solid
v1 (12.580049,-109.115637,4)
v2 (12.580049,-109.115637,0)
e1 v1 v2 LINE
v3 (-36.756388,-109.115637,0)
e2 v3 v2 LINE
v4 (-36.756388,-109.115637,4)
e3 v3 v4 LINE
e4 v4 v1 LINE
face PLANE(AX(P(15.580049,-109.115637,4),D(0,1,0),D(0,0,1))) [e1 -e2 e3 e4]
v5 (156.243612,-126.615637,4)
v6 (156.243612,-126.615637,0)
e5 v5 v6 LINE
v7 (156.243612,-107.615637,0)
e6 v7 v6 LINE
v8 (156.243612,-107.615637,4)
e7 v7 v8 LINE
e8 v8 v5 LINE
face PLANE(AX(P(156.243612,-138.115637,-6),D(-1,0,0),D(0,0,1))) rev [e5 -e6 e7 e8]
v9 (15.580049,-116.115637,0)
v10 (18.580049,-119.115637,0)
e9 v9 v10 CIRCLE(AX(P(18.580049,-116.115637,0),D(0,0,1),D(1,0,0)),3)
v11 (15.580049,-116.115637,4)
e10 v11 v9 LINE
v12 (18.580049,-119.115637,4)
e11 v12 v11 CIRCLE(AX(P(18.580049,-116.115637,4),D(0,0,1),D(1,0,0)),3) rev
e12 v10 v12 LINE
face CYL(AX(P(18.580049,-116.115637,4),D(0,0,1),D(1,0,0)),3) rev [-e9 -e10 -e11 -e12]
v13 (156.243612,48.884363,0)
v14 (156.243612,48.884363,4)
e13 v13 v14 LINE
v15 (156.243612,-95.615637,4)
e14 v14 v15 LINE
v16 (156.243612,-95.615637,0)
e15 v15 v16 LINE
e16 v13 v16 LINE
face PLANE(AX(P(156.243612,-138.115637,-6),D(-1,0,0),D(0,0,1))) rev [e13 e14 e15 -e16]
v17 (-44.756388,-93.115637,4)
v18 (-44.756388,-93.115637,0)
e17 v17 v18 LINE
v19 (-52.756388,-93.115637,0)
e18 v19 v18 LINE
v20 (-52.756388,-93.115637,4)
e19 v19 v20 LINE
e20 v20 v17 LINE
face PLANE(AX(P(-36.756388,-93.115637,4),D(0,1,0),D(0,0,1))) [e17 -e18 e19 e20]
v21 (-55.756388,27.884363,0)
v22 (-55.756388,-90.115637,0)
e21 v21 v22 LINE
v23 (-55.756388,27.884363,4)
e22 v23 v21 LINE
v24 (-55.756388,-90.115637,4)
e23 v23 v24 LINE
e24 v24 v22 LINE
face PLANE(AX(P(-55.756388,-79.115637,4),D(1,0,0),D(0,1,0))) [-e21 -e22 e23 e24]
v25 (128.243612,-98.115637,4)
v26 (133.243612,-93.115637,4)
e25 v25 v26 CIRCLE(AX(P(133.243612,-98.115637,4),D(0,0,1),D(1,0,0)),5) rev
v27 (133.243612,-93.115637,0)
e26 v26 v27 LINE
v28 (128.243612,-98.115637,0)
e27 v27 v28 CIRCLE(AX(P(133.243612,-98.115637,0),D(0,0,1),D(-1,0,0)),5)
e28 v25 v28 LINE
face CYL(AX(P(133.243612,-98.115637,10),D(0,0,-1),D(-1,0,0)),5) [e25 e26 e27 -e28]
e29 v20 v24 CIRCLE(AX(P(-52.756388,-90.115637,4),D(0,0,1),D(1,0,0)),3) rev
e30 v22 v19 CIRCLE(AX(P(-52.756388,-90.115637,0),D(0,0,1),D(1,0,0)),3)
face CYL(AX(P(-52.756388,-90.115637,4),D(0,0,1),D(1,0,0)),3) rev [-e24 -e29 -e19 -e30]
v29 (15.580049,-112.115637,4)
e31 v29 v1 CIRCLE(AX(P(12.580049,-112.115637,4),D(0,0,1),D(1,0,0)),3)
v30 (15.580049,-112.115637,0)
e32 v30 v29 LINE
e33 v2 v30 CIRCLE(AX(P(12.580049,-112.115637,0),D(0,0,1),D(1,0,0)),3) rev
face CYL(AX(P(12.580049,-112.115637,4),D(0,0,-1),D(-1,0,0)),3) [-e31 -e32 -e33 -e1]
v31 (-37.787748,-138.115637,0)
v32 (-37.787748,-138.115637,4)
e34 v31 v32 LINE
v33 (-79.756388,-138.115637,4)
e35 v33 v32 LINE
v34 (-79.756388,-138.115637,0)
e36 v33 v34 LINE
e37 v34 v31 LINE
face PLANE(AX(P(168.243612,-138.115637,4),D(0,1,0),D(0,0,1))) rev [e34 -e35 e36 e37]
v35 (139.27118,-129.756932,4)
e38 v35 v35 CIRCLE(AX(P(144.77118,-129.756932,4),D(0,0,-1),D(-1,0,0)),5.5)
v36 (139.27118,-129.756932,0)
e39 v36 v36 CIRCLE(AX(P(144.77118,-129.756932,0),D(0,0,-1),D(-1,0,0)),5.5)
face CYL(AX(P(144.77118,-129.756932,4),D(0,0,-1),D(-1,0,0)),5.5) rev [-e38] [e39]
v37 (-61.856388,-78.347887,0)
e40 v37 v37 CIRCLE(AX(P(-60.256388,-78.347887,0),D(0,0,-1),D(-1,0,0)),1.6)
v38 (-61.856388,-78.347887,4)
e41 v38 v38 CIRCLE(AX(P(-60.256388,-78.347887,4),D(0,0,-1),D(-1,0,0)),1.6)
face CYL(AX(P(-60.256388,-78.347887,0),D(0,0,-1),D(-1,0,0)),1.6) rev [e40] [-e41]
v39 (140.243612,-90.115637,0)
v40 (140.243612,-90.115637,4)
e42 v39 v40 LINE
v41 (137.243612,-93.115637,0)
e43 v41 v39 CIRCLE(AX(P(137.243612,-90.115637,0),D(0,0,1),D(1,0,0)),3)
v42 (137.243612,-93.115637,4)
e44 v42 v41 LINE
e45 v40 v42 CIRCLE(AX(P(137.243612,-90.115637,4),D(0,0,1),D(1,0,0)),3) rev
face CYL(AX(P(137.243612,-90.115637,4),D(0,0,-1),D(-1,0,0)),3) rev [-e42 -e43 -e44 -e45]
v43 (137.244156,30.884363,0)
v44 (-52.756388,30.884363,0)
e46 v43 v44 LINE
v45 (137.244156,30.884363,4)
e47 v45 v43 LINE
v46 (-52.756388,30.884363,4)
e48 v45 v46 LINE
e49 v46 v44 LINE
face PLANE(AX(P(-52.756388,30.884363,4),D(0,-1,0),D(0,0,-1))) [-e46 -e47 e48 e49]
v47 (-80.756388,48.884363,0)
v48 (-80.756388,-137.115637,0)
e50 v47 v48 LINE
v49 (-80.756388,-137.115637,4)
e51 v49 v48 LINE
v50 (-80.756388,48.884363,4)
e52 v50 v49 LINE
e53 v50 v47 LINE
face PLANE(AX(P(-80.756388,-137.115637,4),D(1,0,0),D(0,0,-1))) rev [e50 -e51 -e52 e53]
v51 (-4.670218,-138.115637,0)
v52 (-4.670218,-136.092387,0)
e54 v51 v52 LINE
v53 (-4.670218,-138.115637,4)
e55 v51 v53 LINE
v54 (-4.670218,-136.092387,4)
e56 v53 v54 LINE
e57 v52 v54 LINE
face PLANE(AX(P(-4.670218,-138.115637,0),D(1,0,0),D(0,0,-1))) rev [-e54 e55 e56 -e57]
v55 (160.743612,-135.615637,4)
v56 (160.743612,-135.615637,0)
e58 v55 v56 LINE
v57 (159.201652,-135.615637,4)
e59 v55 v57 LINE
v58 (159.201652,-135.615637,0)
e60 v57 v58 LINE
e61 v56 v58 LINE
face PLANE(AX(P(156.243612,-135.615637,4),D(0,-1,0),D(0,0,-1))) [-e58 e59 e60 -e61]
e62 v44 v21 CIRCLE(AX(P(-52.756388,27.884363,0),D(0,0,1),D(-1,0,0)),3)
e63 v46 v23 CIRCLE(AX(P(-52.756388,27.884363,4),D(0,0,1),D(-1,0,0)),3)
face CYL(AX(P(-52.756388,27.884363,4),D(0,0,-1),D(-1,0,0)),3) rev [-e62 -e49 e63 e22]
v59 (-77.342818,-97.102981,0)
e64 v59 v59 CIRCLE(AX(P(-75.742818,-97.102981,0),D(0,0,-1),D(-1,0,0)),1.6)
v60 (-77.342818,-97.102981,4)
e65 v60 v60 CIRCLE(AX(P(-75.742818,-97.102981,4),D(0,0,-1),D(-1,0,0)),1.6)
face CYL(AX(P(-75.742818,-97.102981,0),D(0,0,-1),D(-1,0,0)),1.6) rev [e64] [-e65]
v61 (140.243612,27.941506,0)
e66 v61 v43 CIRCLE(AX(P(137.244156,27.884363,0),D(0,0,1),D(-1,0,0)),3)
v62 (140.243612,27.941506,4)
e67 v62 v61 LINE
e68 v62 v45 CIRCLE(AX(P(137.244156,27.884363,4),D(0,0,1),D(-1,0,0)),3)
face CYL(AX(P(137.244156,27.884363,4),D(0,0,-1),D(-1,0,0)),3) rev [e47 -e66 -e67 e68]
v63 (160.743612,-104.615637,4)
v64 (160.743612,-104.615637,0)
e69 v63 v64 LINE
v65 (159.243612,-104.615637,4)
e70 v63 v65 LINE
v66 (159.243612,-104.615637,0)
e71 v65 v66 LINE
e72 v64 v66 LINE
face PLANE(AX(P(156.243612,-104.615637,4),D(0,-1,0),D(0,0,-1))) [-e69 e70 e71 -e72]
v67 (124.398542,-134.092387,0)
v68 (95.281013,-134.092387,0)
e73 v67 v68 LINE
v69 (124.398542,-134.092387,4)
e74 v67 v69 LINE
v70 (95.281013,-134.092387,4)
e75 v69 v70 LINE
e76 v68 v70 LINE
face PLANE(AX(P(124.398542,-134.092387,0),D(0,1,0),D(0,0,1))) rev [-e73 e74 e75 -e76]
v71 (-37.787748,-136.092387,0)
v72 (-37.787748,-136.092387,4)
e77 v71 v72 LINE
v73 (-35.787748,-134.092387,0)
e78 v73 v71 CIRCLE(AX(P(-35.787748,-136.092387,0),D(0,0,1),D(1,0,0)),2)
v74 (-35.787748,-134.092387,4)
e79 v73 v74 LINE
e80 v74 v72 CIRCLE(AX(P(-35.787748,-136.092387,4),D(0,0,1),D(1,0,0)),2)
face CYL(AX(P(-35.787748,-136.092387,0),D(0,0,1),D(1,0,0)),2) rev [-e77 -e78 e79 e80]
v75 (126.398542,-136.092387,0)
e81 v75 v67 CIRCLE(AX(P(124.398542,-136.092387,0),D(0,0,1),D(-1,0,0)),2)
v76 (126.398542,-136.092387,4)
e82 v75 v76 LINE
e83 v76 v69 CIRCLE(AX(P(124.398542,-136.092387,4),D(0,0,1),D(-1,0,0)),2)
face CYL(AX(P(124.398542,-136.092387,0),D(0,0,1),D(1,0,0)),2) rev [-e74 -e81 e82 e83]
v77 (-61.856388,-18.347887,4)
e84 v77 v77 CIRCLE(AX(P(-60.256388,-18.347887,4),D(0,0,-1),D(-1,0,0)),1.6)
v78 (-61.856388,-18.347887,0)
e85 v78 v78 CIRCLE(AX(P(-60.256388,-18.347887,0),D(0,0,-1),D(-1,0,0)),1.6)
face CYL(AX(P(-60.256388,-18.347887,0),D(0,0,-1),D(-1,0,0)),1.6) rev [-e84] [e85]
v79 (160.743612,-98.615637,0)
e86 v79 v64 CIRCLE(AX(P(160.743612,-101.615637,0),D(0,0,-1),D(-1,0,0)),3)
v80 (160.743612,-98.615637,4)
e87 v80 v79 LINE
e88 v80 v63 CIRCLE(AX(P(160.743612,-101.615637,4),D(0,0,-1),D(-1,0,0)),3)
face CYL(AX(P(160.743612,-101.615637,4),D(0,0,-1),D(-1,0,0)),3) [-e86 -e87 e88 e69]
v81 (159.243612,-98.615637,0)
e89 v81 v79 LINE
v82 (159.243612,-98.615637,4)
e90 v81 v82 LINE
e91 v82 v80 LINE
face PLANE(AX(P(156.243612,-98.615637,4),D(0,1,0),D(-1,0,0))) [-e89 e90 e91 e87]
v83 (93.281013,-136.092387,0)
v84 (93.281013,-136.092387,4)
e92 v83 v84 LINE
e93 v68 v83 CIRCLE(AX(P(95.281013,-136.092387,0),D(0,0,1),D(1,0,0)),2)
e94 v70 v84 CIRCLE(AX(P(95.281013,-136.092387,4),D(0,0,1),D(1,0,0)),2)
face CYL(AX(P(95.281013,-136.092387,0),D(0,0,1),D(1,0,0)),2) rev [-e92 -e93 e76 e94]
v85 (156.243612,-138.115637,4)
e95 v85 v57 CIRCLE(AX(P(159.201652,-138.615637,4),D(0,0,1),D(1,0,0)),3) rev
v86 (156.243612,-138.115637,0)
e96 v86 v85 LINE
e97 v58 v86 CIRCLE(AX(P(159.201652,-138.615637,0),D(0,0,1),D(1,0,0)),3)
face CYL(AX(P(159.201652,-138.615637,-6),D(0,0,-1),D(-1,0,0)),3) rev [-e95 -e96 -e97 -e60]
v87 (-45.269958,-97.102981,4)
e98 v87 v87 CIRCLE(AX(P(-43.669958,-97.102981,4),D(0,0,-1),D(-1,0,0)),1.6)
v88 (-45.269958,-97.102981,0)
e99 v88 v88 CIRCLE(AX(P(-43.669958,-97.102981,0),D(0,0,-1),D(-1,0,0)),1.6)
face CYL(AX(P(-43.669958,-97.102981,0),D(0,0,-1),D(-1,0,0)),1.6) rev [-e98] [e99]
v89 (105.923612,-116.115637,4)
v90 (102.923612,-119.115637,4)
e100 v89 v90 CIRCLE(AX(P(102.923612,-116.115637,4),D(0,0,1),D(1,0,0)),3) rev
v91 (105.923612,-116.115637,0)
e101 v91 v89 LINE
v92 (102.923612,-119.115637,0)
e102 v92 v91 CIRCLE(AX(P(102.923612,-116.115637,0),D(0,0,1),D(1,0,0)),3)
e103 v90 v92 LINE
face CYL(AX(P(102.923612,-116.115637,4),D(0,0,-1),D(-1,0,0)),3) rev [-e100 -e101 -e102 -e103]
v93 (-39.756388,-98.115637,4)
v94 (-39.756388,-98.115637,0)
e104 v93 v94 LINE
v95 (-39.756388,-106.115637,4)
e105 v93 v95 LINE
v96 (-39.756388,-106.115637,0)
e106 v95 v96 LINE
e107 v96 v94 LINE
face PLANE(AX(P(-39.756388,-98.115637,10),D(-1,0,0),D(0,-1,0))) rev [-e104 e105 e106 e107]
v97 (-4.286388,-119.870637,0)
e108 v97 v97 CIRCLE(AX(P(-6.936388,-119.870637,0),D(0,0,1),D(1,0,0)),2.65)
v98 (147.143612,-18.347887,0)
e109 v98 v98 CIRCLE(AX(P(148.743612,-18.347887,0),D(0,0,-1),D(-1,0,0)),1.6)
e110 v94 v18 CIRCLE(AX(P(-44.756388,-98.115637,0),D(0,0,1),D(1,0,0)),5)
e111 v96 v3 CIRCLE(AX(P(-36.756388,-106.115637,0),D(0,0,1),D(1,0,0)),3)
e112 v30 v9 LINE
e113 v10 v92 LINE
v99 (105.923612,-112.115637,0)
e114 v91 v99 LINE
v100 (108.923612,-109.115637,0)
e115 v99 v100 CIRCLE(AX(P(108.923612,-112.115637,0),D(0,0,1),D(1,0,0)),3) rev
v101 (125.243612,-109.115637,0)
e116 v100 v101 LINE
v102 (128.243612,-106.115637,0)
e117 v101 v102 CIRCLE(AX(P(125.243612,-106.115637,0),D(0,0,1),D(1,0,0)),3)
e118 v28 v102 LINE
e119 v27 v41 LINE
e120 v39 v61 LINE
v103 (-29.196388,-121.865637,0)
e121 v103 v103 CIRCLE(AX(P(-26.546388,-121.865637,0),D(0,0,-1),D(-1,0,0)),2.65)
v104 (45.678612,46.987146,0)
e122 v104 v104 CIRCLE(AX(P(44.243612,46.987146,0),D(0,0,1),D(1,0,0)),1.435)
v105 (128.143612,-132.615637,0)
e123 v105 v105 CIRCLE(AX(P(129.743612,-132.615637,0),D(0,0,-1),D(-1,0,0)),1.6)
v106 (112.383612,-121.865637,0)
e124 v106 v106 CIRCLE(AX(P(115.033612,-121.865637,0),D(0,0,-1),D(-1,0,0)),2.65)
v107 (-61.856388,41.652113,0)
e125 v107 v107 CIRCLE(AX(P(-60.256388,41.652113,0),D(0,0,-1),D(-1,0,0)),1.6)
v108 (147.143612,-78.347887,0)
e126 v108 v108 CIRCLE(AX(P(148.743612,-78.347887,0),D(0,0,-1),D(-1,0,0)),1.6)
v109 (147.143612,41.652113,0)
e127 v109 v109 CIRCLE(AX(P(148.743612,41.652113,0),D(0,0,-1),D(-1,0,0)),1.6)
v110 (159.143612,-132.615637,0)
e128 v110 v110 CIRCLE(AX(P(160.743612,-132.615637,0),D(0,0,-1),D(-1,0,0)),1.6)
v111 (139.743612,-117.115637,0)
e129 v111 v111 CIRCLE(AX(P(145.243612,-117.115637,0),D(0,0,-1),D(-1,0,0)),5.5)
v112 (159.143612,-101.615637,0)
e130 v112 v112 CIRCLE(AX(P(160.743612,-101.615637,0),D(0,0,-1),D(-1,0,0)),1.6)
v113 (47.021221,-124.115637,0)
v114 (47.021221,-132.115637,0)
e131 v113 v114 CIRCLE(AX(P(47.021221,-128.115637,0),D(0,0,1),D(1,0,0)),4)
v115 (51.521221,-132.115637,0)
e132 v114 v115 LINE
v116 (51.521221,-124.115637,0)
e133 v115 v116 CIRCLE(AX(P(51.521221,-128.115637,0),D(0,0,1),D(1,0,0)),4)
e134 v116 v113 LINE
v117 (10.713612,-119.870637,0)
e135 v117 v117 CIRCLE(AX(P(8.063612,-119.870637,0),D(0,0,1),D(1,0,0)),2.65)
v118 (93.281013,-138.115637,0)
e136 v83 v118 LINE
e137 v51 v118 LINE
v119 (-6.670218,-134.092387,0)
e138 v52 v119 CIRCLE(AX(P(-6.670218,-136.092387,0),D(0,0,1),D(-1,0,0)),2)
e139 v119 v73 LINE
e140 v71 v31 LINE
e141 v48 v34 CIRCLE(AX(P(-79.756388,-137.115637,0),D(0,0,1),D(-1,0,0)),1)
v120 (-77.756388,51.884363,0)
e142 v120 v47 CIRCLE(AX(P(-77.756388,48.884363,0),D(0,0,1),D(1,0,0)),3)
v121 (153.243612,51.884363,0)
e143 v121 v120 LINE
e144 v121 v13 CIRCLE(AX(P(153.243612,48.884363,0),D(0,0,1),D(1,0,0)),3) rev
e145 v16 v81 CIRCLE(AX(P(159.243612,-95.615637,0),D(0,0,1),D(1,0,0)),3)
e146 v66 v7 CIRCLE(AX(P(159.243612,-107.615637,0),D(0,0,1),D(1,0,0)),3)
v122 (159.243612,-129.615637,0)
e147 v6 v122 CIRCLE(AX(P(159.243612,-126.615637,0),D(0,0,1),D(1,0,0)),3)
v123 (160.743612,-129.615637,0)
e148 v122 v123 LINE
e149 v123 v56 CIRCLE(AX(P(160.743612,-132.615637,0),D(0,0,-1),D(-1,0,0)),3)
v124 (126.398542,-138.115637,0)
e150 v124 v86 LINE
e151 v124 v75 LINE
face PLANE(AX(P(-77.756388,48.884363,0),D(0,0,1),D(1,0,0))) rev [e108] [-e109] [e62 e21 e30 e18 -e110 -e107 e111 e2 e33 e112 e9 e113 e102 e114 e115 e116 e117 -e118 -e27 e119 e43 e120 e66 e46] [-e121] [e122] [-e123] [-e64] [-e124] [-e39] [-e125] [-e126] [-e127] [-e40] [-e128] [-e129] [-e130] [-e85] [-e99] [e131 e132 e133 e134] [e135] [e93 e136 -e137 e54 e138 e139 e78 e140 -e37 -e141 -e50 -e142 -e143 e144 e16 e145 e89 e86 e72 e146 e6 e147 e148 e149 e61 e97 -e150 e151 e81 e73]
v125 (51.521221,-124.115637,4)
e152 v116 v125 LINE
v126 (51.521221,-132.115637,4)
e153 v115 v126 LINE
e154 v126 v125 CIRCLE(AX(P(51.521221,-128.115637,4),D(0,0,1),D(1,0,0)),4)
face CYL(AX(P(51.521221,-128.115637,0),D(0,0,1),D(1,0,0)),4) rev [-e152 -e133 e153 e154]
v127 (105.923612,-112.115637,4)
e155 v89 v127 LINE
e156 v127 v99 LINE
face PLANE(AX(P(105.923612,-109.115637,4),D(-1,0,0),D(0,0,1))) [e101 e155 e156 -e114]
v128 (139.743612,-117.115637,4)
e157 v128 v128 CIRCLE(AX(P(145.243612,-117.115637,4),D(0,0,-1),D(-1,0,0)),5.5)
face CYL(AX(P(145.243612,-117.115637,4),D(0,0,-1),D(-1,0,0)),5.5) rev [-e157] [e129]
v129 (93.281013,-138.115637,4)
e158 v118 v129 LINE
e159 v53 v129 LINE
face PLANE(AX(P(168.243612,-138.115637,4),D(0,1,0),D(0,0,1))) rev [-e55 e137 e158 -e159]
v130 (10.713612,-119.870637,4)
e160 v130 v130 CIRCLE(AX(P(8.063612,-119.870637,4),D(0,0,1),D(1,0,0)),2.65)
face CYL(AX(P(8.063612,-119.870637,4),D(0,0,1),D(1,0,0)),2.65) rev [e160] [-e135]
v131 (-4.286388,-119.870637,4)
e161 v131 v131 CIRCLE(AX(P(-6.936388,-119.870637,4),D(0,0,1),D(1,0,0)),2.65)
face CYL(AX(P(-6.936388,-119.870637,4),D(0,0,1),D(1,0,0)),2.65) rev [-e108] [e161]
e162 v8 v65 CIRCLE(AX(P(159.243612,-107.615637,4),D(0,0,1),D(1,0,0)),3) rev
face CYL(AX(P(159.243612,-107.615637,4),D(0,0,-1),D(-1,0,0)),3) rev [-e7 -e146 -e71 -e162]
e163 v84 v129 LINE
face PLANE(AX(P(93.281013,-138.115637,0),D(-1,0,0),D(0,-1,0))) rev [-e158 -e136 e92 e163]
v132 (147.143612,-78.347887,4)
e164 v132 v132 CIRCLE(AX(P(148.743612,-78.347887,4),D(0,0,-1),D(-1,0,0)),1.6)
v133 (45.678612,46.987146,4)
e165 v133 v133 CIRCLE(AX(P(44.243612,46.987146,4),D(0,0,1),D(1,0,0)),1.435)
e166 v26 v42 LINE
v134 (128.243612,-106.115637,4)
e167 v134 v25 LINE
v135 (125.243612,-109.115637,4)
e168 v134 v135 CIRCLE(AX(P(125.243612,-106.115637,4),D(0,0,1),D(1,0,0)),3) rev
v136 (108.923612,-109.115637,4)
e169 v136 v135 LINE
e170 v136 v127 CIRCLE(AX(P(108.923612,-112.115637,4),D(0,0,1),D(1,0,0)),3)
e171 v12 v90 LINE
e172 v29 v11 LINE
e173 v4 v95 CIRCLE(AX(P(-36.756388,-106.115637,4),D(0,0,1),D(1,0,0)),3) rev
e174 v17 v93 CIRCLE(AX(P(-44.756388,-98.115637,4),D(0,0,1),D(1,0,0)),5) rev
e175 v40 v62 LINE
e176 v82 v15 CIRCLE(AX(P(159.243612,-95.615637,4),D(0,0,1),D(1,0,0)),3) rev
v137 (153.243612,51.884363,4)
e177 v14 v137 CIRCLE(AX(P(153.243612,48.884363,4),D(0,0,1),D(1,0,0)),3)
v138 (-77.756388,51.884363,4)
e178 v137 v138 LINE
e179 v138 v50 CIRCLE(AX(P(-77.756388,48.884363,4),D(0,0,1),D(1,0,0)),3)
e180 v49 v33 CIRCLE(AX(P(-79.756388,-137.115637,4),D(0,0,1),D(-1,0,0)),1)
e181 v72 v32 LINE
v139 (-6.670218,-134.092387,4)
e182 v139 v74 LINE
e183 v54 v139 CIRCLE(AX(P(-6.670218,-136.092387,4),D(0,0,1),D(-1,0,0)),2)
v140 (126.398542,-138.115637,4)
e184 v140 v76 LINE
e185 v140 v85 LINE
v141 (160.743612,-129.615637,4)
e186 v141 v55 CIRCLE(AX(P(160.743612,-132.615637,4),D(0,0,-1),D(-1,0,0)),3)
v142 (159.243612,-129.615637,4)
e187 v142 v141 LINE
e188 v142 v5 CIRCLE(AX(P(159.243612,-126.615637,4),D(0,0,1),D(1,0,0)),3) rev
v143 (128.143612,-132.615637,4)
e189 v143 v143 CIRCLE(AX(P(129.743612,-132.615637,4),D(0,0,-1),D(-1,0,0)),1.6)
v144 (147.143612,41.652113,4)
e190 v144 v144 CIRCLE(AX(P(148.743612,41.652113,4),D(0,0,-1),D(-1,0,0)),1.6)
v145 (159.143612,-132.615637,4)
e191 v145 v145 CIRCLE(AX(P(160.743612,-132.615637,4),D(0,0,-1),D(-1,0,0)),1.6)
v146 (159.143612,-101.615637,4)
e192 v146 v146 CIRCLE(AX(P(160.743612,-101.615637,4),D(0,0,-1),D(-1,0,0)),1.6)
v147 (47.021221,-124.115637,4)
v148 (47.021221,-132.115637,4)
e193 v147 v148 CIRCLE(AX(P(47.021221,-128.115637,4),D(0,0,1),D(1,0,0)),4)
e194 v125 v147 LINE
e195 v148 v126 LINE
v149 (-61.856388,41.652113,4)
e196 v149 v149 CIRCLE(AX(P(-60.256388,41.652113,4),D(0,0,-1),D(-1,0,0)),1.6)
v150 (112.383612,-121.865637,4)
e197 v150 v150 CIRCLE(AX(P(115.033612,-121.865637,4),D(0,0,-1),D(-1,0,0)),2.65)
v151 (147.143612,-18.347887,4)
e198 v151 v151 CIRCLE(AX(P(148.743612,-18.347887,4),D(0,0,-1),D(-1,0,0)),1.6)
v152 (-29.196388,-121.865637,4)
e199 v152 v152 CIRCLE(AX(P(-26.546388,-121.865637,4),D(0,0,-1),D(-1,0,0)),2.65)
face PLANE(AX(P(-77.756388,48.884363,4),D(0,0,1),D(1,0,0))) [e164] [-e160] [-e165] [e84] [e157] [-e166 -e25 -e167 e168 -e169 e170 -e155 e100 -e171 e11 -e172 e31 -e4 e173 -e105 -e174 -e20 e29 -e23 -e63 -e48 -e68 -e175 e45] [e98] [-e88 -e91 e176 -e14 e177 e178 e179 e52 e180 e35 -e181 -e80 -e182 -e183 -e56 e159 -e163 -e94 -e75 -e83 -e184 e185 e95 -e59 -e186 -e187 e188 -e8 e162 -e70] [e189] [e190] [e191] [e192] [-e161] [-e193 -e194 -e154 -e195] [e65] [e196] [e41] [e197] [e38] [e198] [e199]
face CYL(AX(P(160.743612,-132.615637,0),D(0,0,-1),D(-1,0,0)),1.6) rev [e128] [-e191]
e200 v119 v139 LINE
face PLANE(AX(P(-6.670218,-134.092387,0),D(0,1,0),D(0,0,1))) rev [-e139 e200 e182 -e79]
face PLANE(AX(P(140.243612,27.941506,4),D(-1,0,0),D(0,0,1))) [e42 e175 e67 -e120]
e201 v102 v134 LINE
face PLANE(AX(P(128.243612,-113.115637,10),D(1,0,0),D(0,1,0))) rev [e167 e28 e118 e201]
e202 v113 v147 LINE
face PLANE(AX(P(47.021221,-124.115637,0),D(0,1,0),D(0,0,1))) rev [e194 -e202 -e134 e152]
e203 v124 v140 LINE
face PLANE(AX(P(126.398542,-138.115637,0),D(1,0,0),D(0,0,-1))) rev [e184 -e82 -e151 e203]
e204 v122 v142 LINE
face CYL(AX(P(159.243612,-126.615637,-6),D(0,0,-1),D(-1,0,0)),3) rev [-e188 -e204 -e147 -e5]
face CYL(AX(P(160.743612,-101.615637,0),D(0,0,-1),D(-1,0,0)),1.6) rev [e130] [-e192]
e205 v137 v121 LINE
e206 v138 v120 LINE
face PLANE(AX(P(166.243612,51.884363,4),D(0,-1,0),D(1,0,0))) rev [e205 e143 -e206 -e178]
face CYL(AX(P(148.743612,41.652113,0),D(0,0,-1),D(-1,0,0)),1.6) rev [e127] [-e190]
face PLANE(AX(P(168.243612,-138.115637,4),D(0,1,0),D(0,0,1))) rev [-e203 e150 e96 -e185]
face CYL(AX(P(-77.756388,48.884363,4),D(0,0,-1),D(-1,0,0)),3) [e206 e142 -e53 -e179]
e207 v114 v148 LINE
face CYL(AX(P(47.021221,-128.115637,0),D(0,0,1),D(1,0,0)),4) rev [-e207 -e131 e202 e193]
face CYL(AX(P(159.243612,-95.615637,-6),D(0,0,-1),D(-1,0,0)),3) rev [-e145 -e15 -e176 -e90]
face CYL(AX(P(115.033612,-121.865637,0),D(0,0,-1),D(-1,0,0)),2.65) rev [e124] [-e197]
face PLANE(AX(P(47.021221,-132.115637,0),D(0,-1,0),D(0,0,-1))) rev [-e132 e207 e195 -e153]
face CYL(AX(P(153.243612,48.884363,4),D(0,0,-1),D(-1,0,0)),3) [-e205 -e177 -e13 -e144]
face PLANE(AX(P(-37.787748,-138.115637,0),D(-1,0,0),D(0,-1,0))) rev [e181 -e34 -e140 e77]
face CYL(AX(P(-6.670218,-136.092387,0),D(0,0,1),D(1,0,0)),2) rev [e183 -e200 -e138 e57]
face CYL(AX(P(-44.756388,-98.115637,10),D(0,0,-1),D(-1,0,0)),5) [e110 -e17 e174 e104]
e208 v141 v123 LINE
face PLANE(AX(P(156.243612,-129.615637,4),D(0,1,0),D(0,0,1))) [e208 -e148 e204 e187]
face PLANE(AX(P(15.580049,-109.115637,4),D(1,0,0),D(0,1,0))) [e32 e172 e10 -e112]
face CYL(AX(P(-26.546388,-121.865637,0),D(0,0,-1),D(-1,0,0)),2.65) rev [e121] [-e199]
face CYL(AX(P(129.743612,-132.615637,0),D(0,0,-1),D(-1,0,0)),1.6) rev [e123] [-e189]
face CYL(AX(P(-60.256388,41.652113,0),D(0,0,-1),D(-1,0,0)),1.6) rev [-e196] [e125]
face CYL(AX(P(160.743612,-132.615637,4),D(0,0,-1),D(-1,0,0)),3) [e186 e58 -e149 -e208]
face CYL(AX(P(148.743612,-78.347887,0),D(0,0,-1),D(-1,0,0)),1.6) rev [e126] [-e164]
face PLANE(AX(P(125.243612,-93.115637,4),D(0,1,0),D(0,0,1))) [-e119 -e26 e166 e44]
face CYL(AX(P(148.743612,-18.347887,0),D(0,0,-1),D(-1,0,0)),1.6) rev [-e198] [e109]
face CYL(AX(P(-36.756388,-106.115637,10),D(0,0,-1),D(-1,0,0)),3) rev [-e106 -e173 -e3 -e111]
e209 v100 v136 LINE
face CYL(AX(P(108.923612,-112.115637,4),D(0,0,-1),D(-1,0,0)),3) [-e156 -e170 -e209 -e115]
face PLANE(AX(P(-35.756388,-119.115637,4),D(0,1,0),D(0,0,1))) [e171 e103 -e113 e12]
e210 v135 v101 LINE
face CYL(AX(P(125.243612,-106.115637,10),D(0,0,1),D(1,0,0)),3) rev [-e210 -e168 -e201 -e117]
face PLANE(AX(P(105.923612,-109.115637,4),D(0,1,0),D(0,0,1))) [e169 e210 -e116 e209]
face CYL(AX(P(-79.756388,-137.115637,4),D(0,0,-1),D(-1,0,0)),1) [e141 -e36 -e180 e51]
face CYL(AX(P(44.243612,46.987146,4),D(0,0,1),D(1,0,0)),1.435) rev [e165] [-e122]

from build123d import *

# Parameters (mm, degrees)
RESSALTO_EXTRUS_O1_DEPTH = 4
FURO_COM_FOLGA_DE_M31_D  = 3.2
FILETE1_R                = 3
M3_CLEARANCE_HOLE1_D     = 3.2
FURO_COM_FOLGA_DE_M32_D  = 2.87
M3_CLEARANCE_HOLE2_D     = 3.2
SKETCH3_W                = 27.430623534
SKETCH3_H                = 190
CUT_EXTRUDE1_DEPTH       = 10
BOSS_EXTRUDE1_DEPTH      = 4
CUT_EXTRUDE3_DEPTH       = 10
FILLET2_R                = 3
FILLET3_R                = 3
SKETCH9_W                = 23.417498706
SKETCH9_H                = 10.613187714
SKETCH9_W_2              = 56.748489153
BOSS_EXTRUDE2_DEPTH      = 4
FILLET4_R                = 3
BOSS_EXTRUDE3_DEPTH      = 4
M3_CLEARANCE_HOLE4_D     = 3.2
FILLET5_R                = 3
M5_CLEARANCE_HOLE1_D     = 5.3
CUT_EXTRUDE4_DEPTH       = 215.251953603
CUT_EXTRUDE5_DEPTH       = 215.251953603
SKETCH15_R               = 5.5
CUT_EXTRUDE6_DEPTH       = 215.251953603
M5_CLEARANCE_HOLE2_D     = 5.3
FILLET6_R                = 3


# Some blends are built 0.0001 mm under size
with BuildPart() as part:
    # Esboço1 → Ressalto-extrusão1 (new body)
    with BuildSketch(Plane.XY):
        with BuildLine():
            Line((168.243612151, -138.115636704), (-79.756387849, -138.115636704))
            ThreePointArc((-79.756387849, -138.115636704), (-80.46349463, -137.822743485), (-80.756387849, -137.115636704))
            Line((-80.756387849, -137.115636704), (-80.756387849, 48.884363296))
            ThreePointArc((-80.756387849, 48.884363296), (-79.877708192, 51.005683639), (-77.756387849, 51.884363296))
            Line((-77.756387849, 51.884363296), (166.243612151, 51.884363296))
            ThreePointArc((166.243612151, 51.884363296), (168.364932495, 51.005683639), (169.243612151, 48.884363296))
            Line((169.243612151, 48.884363296), (169.243612151, -137.115636704))
            ThreePointArc((169.243612151, -137.115636704), (168.950718933, -137.822743485), (168.243612151, -138.115636704))
        make_face()
        with BuildLine():
            Line((-36.756387849, -93.115636704), (-55.756387849, -93.115636704))
            Line((-55.756387849, -93.115636704), (-55.756387849, -79.115636704))
            Line((-55.756387849, -79.115636704), (-55.756387849, 27.884363296))
            ThreePointArc((-55.756387849, 27.884363296), (-54.877708192, 30.005683639), (-52.756387849, 30.884363296))
            Line((-52.756387849, 30.884363296), (141.243612151, 30.884363296))
            ThreePointArc((141.243612151, 30.884363296), (143.364932495, 30.005683639), (144.243612151, 27.884363296))
            Line((144.243612151, 27.884363296), (144.243612151, -79.115636704))
            Line((144.243612151, -79.115636704), (144.243612151, -93.115636704))
            Line((144.243612151, -93.115636704), (125.243612151, -93.115636704))
            Line((125.243612151, -93.115636704), (125.243612151, -118.115636704))
            ThreePointArc((125.243612151, -118.115636704), (124.950718933, -118.822743485), (124.243612151, -119.115636704))
            Line((124.243612151, -119.115636704), (-35.756387849, -119.115636704))
            ThreePointArc((-35.756387849, -119.115636704), (-36.46349463, -118.822743485), (-36.756387849, -118.115636704))
            Line((-36.756387849, -118.115636704), (-36.756387849, -93.115636704))
        make_face(mode=Mode.SUBTRACT)
    extrude(amount=RESSALTO_EXTRUS_O1_DEPTH)

    # Furo com folga de M31 (through all)
    with Locations(Plane(origin=(0, 0, 0), x_dir=(-1, 0, 0), z_dir=(0, 0, -1))):
        with Locations((-148.743612151, -78.347886704), (-148.743612151, -18.347886704), (-148.743612151, 41.652113296), (60.256387849, 41.652113296), (60.256387849, -18.347886704), (60.256387849, -78.347886704)):
            Hole(FURO_COM_FOLGA_DE_M31_D / 2)

    # Filete1
    filete1_edges = [part.edges().sort_by_distance(p)[0] for p in [
        (-55.756387849, -93.115636704, 2),
        (-36.756387849, -93.115636704, 2),
        (125.243612151, -93.115636704, 2),
        (144.243612151, -93.115636704, 2),
    ]]
    fillet(filete1_edges, radius=FILETE1_R)

    # M3 Clearance Hole1 (through all)
    with Locations(Plane(origin=(0, 0, 0), x_dir=(-1, 0, 0), z_dir=(0, 0, -1))):
        with Locations((-164.230041881, -97.102981335), (43.669958119, -97.102981335), (75.742817578, -97.102981335)):
            Hole(M3_CLEARANCE_HOLE1_D / 2)

    # Furo com folga de M32 (through all)
    with Locations(Plane.XY.offset(4)):
        with Locations((44.243612151, 46.98714614)):
            Hole(FURO_COM_FOLGA_DE_M32_D / 2)

    # M3 Clearance Hole2 (through all)
    with Locations(Plane.XY.offset(4)):
        with Locations((161.560317261, 35.480164232), (161.560317261, 4.480164232)):
            Hole(M3_CLEARANCE_HOLE2_D / 2)

    # Sketch3 → Cut-Extrude1 (cut)
    with BuildSketch(Plane.XY.offset(4)):
        with Locations((169.958923918, -43.115636704)):
            Rectangle(SKETCH3_W, SKETCH3_H)
    extrude(amount=-CUT_EXTRUDE1_DEPTH, mode=Mode.SUBTRACT)

    # Sketch5 → Boss-Extrude1 (add)
    with BuildSketch(Plane(origin=(0, 0, 0), x_dir=(-1, 0, 0), z_dir=(0, 0, -1))):
        with BuildLine():
            Line((-145.240285588, -97.500155699), (-140.243612151, -97.500155699))
            Line((-140.243612151, -97.500155699), (-140.243612151, 27.941506315))
            ThreePointArc((-140.243612151, 27.941506315), (-139.345176367, 30.025791601), (-137.244155982, 30.884363296))
            Line((-137.244155982, 30.884363296), (-145.240285588, 30.884363296))
            Line((-145.240285588, 30.884363296), (-145.240285588, -97.500155699))
        make_face()
    extrude(amount=-BOSS_EXTRUDE1_DEPTH)

    # Sketch6 → Cut-Extrude3 (cut)
    with BuildSketch(Plane(origin=(0, 0, 0), x_dir=(-1, 0, 0), z_dir=(0, 0, -1))):
        with BuildLine():
            Line((-108.923612151, -113.115636704), (-128.243612151, -113.115636704))
            Line((-128.243612151, -113.115636704), (-128.243612151, -98.115636704))
            ThreePointArc((-128.243612151, -98.115636704), (-129.708078246, -94.580102798), (-133.243612151, -93.115636704))
            Line((-133.243612151, -93.115636704), (44.756387849, -93.115636704))
            ThreePointArc((44.756387849, -93.115636704), (41.220853943, -94.580102798), (39.756387849, -98.115636704))
            Line((39.756387849, -98.115636704), (39.756387849, -113.115636704))
            Line((39.756387849, -113.115636704), (20.436387849, -113.115636704))
            Line((20.436387849, -113.115636704), (20.436387849, -119.115636704))
            Line((20.436387849, -119.115636704), (-108.923612151, -119.115636704))
            Line((-108.923612151, -119.115636704), (-108.923612151, -113.115636704))
        make_face()
    extrude(amount=-CUT_EXTRUDE3_DEPTH, mode=Mode.SUBTRACT)

    # Fillet2
    fillet2_edges = [part.edges().sort_by_distance(p)[0] for p in [
        (-39.756387849, -113.115636704, 2),
        (128.243612151, -113.115636704, 2),
        (140.243612151, -93.115636704, 2),
    ]]
    fillet(fillet2_edges, radius=FILLET2_R - 0.0001)  # a hair under: the kernel refuses the full size

    # Fillet3
    fillet3_edges = [part.edges().sort_by_distance(p)[0] for p in [
        (156.243612151, 51.884363296, 2),
    ]]
    fillet(fillet3_edges, radius=FILLET3_R)

    # Sketch9 → Boss-Extrude2 (add)
    with BuildSketch(Plane(origin=(0, 0, 0), x_dir=(-1, 0, 0), z_dir=(0, 0, -1))):
        with Locations((-117.632361503, -114.422230557)):
            Rectangle(SKETCH9_W, SKETCH9_H)
        with Locations((12.794195261, -114.422230557)):
            Rectangle(SKETCH9_W_2, SKETCH9_H)
    extrude(amount=-BOSS_EXTRUDE2_DEPTH)

    # Fillet4
    fillet4_edges = [part.edges().sort_by_distance(p)[0] for p in [
        (105.92361215, -119.115636704, 2),
        (105.92361215, -109.1156367, 2),
        (15.580049316, -119.115636704, 2),
        (15.580049316, -109.1156367, 2),
    ]]
    fillet(fillet4_edges, radius=FILLET4_R)

    # Sketch10 → Boss-Extrude3 (add)
    with BuildSketch(Plane(origin=(0, 0, 0), x_dir=(-1, 0, 0), z_dir=(0, 0, -1))):
        with BuildLine():
            Line((-156.243612151, -135.615636704), (-160.743612151, -135.615636704))
            ThreePointArc((-160.743612151, -135.615636704), (-163.743612151, -132.615636704), (-160.743612151, -129.615636704))
            Line((-160.743612151, -129.615636704), (-156.243612151, -129.615636704))
            Line((-156.243612151, -129.615636704), (-156.243612151, -135.615636704))
        make_face()
        with BuildLine():
            Line((-156.243612151, -98.615636704), (-160.743612151, -98.615636704))
            ThreePointArc((-160.743612151, -98.615636704), (-163.743612151, -101.615636704), (-160.743612151, -104.615636704))
            Line((-160.743612151, -104.615636704), (-156.243612151, -104.615636704))
            Line((-156.243612151, -104.615636704), (-156.243612151, -98.615636704))
        make_face()
    extrude(amount=-BOSS_EXTRUDE3_DEPTH)

    # M3 Clearance Hole4 (through all)
    with Locations(Plane(origin=(0, 0, 0), x_dir=(-1, 0, 0), z_dir=(0, 0, -1))):
        with Locations((-160.743612151, -101.615636704), (-160.743612151, -132.615636704), (-129.743612151, -132.615636704)):
            Hole(M3_CLEARANCE_HOLE4_D / 2)

    # Fillet5
    # the kernel refuses this fillet: 3 mm, written as the material it adds along each edge
    with BuildSketch(Plane(origin=(156.243612151, -129.615636704, 0), x_dir=(0, 1, 0), z_dir=(0, 0, 1)), Plane(origin=(156.243612151, -98.615636704, 0), x_dir=(0, 1, 0), z_dir=(0, 0, 1)), Plane(origin=(156.243612151, -104.615636704, 0), x_dir=(1, 0, 0), z_dir=(0, 0, 1))) as fillet5_piece_1:
        with BuildLine():
            CenterArc((FILLET5_R, -FILLET5_R), FILLET5_R, 90, 90)
            Line((0, -FILLET5_R), (-FILLET5_R * 0.02, -FILLET5_R))
            Line((-FILLET5_R * 0.02, -FILLET5_R), (-FILLET5_R * 0.02, FILLET5_R * 0.02))
            Line((-FILLET5_R * 0.02, FILLET5_R * 0.02), (FILLET5_R, FILLET5_R * 0.02))
            Line((FILLET5_R, FILLET5_R * 0.02), (FILLET5_R, 0))
        make_face()
    extrude(amount=4)
    with BuildSketch(Plane(origin=(156.243612151, -135.615636704, 0), x_dir=(0, -1, 0), z_dir=(0, 0, 1))) as fillet5_piece_2:
        with BuildLine():
            CenterArc((3, 2.958039892), FILLET5_R, 180, 80.405931773)
            Line((0, 2.958039892), (-0.06, 2.958039892))
            Line((-0.06, 2.958039892), (-0.06, 0))
            Line((-0.06, 0), (0, -0.06))
            ThreePointArc((0, -0.06), (1.25, -0.06), (2.49, -0.059160798))
            Line((2.49, -0.059160798), (2.5, 0))
        make_face()
    extrude(amount=4)

    # M5 Clearance Hole1 (through all)
    with Locations(Plane(origin=(0, 0, 0), x_dir=(-1, 0, 0), z_dir=(0, 0, -1))):
        with Locations((-115.03361215, -121.8656367), (26.54638785, -121.8656367)):
            Hole(M5_CLEARANCE_HOLE1_D / 2)

    # Sketch13 → Cut-Extrude4 (cut, through all)
    with BuildSketch(Plane.XY.offset(4)):
        with BuildLine():
            Line((-4.670217718, -138.115636704), (-37.787747523, -138.115636704))
            Line((-37.787747523, -138.115636704), (-37.787747523, -136.092387065))
            ThreePointArc((-37.787747523, -136.092387065), (-37.201961086, -134.678173503), (-35.787747523, -134.092387065))
            Line((-35.787747523, -134.092387065), (-6.670217718, -134.092387065))
            ThreePointArc((-6.670217718, -134.092387065), (-5.256004156, -134.678173503), (-4.670217718, -136.092387065))
            Line((-4.670217718, -136.092387065), (-4.670217718, -138.115636704))
        make_face()
        with BuildLine():
            Line((126.398542328, -138.115636704), (93.281012523, -138.115636704))
            Line((93.281012523, -138.115636704), (93.281012523, -136.092387065))
            ThreePointArc((93.281012523, -136.092387065), (93.866798961, -134.678173503), (95.281012523, -134.092387065))
            Line((95.281012523, -134.092387065), (124.398542328, -134.092387065))
            ThreePointArc((124.398542328, -134.092387065), (125.812755891, -134.678173503), (126.398542328, -136.092387065))
            Line((126.398542328, -136.092387065), (126.398542328, -138.115636704))
        make_face()
    extrude(amount=-CUT_EXTRUDE4_DEPTH, mode=Mode.SUBTRACT)

    # Sketch14 → Cut-Extrude5 (cut, through all)
    with BuildSketch(Plane.XY.offset(4)):
        with BuildLine():
            Line((47.021220635, -124.115636704), (51.521220635, -124.115636704))
            ThreePointArc((51.521220635, -124.115636704), (55.521220635, -128.115636704), (51.521220635, -132.115636704))
            Line((51.521220635, -132.115636704), (47.021220635, -132.115636704))
            ThreePointArc((47.021220635, -132.115636704), (43.021220635, -128.115636704), (47.021220635, -124.115636704))
        make_face()
    extrude(amount=-CUT_EXTRUDE5_DEPTH, mode=Mode.SUBTRACT)

    # Sketch15 → Cut-Extrude6 (cut, through all)
    with BuildSketch(Plane(origin=(0, 0, 0), x_dir=(-1, 0, 0), z_dir=(0, 0, -1))):
        with Locations((-144.771180456, -129.756932302)):
            Circle(SKETCH15_R)
        with Locations((-145.243612151, -117.115636704)):
            Circle(SKETCH15_R)
    extrude(amount=-CUT_EXTRUDE6_DEPTH, mode=Mode.SUBTRACT)

    # M5 Clearance Hole2 (through all)
    with Locations(Plane.XY.offset(4)):
        with Locations((-6.93638785, -119.870636704), (8.06361215, -119.870636704)):
            Hole(M5_CLEARANCE_HOLE2_D / 2)

    # Fillet6
    fillet6_edges = [part.edges().sort_by_distance(p)[0] for p in [
        (128.243612151, -109.1156367, 2),
        (-39.756387849, -109.1156367, 2),
    ]]
    fillet(fillet6_edges, radius=FILLET6_R)


solid = part.part
